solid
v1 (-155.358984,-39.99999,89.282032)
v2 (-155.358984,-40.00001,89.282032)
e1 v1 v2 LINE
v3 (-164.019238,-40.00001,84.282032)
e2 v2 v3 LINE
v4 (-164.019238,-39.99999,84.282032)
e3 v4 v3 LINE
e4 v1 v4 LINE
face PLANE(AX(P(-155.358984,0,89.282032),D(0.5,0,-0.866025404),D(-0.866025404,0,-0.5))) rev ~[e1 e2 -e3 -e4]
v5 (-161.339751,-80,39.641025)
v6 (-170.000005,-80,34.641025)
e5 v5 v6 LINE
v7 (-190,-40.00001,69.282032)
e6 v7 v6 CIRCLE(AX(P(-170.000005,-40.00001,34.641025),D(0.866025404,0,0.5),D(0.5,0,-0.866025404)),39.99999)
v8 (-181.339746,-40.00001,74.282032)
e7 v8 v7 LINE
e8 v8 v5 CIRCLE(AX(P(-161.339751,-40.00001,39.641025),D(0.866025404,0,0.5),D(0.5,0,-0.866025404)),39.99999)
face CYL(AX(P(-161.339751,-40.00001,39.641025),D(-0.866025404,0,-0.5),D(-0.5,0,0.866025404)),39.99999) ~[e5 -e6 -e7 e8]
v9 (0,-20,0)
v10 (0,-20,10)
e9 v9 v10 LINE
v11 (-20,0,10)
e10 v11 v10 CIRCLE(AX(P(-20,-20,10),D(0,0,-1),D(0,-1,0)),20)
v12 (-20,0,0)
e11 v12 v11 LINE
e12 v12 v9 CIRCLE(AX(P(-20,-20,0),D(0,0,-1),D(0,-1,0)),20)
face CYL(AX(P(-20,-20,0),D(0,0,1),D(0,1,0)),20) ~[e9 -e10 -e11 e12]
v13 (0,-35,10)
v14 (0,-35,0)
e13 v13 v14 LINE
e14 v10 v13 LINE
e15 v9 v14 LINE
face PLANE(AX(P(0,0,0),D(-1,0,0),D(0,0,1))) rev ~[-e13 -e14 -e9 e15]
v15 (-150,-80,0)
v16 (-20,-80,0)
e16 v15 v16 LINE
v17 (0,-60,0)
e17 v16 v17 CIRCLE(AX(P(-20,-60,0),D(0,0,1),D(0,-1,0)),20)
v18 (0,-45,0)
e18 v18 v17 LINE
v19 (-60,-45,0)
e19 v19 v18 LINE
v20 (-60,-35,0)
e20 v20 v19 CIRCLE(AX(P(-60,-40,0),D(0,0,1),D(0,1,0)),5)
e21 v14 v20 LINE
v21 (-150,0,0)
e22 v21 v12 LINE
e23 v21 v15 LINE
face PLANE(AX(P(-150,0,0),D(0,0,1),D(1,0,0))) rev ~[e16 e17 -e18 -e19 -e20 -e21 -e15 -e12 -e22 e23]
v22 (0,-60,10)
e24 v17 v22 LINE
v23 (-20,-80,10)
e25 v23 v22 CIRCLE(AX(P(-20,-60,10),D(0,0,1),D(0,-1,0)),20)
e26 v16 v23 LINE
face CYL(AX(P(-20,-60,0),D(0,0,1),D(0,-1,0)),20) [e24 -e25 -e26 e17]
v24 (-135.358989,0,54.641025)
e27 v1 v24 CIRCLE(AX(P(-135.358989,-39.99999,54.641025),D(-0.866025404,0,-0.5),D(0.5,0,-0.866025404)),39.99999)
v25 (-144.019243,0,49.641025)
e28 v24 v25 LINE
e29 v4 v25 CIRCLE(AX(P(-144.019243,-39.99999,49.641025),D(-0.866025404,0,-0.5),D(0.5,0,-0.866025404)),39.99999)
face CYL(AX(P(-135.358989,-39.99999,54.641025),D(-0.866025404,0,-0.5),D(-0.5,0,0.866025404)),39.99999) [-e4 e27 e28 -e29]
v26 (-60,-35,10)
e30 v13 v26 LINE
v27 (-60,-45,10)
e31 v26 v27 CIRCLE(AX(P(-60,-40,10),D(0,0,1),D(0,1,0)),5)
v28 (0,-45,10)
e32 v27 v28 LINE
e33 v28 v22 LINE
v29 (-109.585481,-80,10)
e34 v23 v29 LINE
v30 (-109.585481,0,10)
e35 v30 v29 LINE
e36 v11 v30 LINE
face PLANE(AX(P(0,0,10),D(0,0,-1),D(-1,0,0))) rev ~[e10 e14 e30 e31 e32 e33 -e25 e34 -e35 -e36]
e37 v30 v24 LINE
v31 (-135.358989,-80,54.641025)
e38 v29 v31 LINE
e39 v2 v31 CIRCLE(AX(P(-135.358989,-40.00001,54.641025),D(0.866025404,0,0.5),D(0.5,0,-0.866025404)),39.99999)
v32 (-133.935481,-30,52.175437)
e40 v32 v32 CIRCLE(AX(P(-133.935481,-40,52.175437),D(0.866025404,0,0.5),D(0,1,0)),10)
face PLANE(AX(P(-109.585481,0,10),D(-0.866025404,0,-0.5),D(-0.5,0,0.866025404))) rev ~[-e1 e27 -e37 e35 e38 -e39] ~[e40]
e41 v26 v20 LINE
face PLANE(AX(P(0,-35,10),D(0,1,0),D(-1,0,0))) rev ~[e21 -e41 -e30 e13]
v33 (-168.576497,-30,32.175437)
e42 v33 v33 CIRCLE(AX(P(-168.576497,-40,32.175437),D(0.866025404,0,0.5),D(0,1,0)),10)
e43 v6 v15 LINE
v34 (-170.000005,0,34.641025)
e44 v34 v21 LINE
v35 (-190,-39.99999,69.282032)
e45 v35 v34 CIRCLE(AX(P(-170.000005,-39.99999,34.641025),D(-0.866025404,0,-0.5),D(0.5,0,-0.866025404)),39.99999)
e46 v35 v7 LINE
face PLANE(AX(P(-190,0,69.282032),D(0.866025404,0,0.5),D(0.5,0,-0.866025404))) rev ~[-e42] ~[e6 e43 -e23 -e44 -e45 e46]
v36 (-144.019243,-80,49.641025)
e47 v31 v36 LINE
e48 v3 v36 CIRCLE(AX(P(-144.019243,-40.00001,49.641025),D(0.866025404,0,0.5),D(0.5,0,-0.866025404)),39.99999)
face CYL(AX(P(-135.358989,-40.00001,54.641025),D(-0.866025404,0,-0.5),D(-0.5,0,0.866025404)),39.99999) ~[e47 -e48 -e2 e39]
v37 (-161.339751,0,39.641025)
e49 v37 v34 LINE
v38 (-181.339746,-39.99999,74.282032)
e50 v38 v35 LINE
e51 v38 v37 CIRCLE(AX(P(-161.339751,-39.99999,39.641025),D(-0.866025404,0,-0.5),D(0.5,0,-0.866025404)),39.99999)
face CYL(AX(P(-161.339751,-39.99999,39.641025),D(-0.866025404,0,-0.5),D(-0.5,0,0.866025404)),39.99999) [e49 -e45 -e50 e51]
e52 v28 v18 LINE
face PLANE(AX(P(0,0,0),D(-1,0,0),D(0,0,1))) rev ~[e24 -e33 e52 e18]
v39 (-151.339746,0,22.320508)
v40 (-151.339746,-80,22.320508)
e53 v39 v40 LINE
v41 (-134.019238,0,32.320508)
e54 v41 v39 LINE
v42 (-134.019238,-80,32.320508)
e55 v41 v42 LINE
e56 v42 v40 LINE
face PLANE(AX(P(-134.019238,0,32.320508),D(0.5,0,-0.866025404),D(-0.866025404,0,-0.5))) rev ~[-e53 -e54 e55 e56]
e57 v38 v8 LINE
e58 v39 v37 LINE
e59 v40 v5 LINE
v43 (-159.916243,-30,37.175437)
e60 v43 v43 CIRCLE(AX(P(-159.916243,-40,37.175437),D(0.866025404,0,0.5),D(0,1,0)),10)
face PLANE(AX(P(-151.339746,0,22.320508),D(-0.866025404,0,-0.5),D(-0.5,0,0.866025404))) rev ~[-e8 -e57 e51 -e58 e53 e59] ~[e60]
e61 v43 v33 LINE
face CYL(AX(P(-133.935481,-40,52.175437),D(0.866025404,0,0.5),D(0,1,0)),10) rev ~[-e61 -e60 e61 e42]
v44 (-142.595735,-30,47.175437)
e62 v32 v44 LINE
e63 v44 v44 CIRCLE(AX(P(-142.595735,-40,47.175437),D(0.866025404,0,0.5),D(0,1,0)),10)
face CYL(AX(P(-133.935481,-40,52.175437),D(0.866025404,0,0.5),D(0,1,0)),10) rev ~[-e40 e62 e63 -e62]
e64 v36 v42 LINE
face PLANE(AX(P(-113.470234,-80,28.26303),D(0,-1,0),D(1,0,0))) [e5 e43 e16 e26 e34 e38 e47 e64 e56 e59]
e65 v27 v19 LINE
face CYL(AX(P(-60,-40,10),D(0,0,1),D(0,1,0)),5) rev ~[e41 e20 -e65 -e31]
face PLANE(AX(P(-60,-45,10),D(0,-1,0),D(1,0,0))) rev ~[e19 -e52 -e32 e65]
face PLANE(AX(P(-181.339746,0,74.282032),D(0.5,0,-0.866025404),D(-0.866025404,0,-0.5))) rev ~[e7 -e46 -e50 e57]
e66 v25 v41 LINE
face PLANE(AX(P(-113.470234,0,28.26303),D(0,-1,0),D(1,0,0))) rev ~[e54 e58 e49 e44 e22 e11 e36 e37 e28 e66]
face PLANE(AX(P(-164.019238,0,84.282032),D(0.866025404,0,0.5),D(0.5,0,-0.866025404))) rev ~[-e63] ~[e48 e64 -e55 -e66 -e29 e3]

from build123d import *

# Parameters (mm, degrees)
F1_DEPTH = 80
F2_R     = 39.99999
F3_R     = 10
F4_DEPTH = 45
F6_DEPTH = 25
F7_R     = 20


# Not quite as in the source:
# - a fillet or chamfer is up to 0.001 mm smaller than in the source, because OpenCascade refuses the exact size


with BuildPart() as f1:
    # F0 (on Front) → F1 (new body)
    with BuildSketch(Plane.XZ):
        Polygon((-150, 0), (0, 0), (0, 10), (-109.5854811567, 10), (-155.3589838486, 89.2820323028), (-164.0192378865, 84.2820323028), (-134.0192378865, 32.3205080757), (-151.3397459622, 22.3205080757), (-181.3397459622, 74.2820323028), (-190, 69.2820323028), align=None)
    extrude(amount=F1_DEPTH)

    # F2 (radius 40 in the source; OpenCascade refuses exactly that, so slightly less here)
    f2_edges = [f1.edges().sort_by_distance(p)[0] for p in [
        (-159.689111, -80, 86.782032),
        (-159.689111, 0, 86.782032),
        (-185.669873, -80, 71.782032),
        (-185.669873, 0, 71.782032),
    ]]
    fillet(f2_edges, radius=F2_R)

    # F3 (on face) → F4 (cut)
    with BuildSketch(Plane(origin=(-77.8589838486, 0, -44.9519052838), x_dir=(0, 1, 0), z_dir=(0.8660254038, 0, 0.5))):
        with Locations((-40, 112.1529946162)):
            Circle(F3_R)
    extrude(amount=-F4_DEPTH, mode=Mode.SUBTRACT)

    # F5 (on face) → F6 (cut)
    with BuildSketch(Plane.XY.offset(10)):
        with BuildLine():
            Line((0, -40), (0, -35))
            Line((0, -35), (-60, -35))
            ThreePointArc((-60, -35), (-56.4644660941, -36.4644660941), (-55, -40))
            Line((-55, -40), (0, -40))
        make_face()
        with BuildLine():
            ThreePointArc((-55, -40), (-56.4644660941, -36.4644660941), (-60, -35))
            ThreePointArc((-60, -35), (-65, -40), (-60, -45))
            ThreePointArc((-60, -45), (-56.4644660941, -43.5355339059), (-55, -40))
        make_face()
        with BuildLine():
            Line((0, -45), (0, -40))
            Line((0, -40), (-55, -40))
            ThreePointArc((-55, -40), (-56.4644660941, -43.5355339059), (-60, -45))
            Line((-60, -45), (0, -45))
        make_face()
    extrude(amount=-F6_DEPTH, mode=Mode.SUBTRACT)

    # F7
    f7_edges = [f1.edges().sort_by_distance(p)[0] for p in [
        (0, -80, 5),
        (0, 0, 5),
    ]]
    fillet(f7_edges, radius=F7_R)


solid = f1.part
